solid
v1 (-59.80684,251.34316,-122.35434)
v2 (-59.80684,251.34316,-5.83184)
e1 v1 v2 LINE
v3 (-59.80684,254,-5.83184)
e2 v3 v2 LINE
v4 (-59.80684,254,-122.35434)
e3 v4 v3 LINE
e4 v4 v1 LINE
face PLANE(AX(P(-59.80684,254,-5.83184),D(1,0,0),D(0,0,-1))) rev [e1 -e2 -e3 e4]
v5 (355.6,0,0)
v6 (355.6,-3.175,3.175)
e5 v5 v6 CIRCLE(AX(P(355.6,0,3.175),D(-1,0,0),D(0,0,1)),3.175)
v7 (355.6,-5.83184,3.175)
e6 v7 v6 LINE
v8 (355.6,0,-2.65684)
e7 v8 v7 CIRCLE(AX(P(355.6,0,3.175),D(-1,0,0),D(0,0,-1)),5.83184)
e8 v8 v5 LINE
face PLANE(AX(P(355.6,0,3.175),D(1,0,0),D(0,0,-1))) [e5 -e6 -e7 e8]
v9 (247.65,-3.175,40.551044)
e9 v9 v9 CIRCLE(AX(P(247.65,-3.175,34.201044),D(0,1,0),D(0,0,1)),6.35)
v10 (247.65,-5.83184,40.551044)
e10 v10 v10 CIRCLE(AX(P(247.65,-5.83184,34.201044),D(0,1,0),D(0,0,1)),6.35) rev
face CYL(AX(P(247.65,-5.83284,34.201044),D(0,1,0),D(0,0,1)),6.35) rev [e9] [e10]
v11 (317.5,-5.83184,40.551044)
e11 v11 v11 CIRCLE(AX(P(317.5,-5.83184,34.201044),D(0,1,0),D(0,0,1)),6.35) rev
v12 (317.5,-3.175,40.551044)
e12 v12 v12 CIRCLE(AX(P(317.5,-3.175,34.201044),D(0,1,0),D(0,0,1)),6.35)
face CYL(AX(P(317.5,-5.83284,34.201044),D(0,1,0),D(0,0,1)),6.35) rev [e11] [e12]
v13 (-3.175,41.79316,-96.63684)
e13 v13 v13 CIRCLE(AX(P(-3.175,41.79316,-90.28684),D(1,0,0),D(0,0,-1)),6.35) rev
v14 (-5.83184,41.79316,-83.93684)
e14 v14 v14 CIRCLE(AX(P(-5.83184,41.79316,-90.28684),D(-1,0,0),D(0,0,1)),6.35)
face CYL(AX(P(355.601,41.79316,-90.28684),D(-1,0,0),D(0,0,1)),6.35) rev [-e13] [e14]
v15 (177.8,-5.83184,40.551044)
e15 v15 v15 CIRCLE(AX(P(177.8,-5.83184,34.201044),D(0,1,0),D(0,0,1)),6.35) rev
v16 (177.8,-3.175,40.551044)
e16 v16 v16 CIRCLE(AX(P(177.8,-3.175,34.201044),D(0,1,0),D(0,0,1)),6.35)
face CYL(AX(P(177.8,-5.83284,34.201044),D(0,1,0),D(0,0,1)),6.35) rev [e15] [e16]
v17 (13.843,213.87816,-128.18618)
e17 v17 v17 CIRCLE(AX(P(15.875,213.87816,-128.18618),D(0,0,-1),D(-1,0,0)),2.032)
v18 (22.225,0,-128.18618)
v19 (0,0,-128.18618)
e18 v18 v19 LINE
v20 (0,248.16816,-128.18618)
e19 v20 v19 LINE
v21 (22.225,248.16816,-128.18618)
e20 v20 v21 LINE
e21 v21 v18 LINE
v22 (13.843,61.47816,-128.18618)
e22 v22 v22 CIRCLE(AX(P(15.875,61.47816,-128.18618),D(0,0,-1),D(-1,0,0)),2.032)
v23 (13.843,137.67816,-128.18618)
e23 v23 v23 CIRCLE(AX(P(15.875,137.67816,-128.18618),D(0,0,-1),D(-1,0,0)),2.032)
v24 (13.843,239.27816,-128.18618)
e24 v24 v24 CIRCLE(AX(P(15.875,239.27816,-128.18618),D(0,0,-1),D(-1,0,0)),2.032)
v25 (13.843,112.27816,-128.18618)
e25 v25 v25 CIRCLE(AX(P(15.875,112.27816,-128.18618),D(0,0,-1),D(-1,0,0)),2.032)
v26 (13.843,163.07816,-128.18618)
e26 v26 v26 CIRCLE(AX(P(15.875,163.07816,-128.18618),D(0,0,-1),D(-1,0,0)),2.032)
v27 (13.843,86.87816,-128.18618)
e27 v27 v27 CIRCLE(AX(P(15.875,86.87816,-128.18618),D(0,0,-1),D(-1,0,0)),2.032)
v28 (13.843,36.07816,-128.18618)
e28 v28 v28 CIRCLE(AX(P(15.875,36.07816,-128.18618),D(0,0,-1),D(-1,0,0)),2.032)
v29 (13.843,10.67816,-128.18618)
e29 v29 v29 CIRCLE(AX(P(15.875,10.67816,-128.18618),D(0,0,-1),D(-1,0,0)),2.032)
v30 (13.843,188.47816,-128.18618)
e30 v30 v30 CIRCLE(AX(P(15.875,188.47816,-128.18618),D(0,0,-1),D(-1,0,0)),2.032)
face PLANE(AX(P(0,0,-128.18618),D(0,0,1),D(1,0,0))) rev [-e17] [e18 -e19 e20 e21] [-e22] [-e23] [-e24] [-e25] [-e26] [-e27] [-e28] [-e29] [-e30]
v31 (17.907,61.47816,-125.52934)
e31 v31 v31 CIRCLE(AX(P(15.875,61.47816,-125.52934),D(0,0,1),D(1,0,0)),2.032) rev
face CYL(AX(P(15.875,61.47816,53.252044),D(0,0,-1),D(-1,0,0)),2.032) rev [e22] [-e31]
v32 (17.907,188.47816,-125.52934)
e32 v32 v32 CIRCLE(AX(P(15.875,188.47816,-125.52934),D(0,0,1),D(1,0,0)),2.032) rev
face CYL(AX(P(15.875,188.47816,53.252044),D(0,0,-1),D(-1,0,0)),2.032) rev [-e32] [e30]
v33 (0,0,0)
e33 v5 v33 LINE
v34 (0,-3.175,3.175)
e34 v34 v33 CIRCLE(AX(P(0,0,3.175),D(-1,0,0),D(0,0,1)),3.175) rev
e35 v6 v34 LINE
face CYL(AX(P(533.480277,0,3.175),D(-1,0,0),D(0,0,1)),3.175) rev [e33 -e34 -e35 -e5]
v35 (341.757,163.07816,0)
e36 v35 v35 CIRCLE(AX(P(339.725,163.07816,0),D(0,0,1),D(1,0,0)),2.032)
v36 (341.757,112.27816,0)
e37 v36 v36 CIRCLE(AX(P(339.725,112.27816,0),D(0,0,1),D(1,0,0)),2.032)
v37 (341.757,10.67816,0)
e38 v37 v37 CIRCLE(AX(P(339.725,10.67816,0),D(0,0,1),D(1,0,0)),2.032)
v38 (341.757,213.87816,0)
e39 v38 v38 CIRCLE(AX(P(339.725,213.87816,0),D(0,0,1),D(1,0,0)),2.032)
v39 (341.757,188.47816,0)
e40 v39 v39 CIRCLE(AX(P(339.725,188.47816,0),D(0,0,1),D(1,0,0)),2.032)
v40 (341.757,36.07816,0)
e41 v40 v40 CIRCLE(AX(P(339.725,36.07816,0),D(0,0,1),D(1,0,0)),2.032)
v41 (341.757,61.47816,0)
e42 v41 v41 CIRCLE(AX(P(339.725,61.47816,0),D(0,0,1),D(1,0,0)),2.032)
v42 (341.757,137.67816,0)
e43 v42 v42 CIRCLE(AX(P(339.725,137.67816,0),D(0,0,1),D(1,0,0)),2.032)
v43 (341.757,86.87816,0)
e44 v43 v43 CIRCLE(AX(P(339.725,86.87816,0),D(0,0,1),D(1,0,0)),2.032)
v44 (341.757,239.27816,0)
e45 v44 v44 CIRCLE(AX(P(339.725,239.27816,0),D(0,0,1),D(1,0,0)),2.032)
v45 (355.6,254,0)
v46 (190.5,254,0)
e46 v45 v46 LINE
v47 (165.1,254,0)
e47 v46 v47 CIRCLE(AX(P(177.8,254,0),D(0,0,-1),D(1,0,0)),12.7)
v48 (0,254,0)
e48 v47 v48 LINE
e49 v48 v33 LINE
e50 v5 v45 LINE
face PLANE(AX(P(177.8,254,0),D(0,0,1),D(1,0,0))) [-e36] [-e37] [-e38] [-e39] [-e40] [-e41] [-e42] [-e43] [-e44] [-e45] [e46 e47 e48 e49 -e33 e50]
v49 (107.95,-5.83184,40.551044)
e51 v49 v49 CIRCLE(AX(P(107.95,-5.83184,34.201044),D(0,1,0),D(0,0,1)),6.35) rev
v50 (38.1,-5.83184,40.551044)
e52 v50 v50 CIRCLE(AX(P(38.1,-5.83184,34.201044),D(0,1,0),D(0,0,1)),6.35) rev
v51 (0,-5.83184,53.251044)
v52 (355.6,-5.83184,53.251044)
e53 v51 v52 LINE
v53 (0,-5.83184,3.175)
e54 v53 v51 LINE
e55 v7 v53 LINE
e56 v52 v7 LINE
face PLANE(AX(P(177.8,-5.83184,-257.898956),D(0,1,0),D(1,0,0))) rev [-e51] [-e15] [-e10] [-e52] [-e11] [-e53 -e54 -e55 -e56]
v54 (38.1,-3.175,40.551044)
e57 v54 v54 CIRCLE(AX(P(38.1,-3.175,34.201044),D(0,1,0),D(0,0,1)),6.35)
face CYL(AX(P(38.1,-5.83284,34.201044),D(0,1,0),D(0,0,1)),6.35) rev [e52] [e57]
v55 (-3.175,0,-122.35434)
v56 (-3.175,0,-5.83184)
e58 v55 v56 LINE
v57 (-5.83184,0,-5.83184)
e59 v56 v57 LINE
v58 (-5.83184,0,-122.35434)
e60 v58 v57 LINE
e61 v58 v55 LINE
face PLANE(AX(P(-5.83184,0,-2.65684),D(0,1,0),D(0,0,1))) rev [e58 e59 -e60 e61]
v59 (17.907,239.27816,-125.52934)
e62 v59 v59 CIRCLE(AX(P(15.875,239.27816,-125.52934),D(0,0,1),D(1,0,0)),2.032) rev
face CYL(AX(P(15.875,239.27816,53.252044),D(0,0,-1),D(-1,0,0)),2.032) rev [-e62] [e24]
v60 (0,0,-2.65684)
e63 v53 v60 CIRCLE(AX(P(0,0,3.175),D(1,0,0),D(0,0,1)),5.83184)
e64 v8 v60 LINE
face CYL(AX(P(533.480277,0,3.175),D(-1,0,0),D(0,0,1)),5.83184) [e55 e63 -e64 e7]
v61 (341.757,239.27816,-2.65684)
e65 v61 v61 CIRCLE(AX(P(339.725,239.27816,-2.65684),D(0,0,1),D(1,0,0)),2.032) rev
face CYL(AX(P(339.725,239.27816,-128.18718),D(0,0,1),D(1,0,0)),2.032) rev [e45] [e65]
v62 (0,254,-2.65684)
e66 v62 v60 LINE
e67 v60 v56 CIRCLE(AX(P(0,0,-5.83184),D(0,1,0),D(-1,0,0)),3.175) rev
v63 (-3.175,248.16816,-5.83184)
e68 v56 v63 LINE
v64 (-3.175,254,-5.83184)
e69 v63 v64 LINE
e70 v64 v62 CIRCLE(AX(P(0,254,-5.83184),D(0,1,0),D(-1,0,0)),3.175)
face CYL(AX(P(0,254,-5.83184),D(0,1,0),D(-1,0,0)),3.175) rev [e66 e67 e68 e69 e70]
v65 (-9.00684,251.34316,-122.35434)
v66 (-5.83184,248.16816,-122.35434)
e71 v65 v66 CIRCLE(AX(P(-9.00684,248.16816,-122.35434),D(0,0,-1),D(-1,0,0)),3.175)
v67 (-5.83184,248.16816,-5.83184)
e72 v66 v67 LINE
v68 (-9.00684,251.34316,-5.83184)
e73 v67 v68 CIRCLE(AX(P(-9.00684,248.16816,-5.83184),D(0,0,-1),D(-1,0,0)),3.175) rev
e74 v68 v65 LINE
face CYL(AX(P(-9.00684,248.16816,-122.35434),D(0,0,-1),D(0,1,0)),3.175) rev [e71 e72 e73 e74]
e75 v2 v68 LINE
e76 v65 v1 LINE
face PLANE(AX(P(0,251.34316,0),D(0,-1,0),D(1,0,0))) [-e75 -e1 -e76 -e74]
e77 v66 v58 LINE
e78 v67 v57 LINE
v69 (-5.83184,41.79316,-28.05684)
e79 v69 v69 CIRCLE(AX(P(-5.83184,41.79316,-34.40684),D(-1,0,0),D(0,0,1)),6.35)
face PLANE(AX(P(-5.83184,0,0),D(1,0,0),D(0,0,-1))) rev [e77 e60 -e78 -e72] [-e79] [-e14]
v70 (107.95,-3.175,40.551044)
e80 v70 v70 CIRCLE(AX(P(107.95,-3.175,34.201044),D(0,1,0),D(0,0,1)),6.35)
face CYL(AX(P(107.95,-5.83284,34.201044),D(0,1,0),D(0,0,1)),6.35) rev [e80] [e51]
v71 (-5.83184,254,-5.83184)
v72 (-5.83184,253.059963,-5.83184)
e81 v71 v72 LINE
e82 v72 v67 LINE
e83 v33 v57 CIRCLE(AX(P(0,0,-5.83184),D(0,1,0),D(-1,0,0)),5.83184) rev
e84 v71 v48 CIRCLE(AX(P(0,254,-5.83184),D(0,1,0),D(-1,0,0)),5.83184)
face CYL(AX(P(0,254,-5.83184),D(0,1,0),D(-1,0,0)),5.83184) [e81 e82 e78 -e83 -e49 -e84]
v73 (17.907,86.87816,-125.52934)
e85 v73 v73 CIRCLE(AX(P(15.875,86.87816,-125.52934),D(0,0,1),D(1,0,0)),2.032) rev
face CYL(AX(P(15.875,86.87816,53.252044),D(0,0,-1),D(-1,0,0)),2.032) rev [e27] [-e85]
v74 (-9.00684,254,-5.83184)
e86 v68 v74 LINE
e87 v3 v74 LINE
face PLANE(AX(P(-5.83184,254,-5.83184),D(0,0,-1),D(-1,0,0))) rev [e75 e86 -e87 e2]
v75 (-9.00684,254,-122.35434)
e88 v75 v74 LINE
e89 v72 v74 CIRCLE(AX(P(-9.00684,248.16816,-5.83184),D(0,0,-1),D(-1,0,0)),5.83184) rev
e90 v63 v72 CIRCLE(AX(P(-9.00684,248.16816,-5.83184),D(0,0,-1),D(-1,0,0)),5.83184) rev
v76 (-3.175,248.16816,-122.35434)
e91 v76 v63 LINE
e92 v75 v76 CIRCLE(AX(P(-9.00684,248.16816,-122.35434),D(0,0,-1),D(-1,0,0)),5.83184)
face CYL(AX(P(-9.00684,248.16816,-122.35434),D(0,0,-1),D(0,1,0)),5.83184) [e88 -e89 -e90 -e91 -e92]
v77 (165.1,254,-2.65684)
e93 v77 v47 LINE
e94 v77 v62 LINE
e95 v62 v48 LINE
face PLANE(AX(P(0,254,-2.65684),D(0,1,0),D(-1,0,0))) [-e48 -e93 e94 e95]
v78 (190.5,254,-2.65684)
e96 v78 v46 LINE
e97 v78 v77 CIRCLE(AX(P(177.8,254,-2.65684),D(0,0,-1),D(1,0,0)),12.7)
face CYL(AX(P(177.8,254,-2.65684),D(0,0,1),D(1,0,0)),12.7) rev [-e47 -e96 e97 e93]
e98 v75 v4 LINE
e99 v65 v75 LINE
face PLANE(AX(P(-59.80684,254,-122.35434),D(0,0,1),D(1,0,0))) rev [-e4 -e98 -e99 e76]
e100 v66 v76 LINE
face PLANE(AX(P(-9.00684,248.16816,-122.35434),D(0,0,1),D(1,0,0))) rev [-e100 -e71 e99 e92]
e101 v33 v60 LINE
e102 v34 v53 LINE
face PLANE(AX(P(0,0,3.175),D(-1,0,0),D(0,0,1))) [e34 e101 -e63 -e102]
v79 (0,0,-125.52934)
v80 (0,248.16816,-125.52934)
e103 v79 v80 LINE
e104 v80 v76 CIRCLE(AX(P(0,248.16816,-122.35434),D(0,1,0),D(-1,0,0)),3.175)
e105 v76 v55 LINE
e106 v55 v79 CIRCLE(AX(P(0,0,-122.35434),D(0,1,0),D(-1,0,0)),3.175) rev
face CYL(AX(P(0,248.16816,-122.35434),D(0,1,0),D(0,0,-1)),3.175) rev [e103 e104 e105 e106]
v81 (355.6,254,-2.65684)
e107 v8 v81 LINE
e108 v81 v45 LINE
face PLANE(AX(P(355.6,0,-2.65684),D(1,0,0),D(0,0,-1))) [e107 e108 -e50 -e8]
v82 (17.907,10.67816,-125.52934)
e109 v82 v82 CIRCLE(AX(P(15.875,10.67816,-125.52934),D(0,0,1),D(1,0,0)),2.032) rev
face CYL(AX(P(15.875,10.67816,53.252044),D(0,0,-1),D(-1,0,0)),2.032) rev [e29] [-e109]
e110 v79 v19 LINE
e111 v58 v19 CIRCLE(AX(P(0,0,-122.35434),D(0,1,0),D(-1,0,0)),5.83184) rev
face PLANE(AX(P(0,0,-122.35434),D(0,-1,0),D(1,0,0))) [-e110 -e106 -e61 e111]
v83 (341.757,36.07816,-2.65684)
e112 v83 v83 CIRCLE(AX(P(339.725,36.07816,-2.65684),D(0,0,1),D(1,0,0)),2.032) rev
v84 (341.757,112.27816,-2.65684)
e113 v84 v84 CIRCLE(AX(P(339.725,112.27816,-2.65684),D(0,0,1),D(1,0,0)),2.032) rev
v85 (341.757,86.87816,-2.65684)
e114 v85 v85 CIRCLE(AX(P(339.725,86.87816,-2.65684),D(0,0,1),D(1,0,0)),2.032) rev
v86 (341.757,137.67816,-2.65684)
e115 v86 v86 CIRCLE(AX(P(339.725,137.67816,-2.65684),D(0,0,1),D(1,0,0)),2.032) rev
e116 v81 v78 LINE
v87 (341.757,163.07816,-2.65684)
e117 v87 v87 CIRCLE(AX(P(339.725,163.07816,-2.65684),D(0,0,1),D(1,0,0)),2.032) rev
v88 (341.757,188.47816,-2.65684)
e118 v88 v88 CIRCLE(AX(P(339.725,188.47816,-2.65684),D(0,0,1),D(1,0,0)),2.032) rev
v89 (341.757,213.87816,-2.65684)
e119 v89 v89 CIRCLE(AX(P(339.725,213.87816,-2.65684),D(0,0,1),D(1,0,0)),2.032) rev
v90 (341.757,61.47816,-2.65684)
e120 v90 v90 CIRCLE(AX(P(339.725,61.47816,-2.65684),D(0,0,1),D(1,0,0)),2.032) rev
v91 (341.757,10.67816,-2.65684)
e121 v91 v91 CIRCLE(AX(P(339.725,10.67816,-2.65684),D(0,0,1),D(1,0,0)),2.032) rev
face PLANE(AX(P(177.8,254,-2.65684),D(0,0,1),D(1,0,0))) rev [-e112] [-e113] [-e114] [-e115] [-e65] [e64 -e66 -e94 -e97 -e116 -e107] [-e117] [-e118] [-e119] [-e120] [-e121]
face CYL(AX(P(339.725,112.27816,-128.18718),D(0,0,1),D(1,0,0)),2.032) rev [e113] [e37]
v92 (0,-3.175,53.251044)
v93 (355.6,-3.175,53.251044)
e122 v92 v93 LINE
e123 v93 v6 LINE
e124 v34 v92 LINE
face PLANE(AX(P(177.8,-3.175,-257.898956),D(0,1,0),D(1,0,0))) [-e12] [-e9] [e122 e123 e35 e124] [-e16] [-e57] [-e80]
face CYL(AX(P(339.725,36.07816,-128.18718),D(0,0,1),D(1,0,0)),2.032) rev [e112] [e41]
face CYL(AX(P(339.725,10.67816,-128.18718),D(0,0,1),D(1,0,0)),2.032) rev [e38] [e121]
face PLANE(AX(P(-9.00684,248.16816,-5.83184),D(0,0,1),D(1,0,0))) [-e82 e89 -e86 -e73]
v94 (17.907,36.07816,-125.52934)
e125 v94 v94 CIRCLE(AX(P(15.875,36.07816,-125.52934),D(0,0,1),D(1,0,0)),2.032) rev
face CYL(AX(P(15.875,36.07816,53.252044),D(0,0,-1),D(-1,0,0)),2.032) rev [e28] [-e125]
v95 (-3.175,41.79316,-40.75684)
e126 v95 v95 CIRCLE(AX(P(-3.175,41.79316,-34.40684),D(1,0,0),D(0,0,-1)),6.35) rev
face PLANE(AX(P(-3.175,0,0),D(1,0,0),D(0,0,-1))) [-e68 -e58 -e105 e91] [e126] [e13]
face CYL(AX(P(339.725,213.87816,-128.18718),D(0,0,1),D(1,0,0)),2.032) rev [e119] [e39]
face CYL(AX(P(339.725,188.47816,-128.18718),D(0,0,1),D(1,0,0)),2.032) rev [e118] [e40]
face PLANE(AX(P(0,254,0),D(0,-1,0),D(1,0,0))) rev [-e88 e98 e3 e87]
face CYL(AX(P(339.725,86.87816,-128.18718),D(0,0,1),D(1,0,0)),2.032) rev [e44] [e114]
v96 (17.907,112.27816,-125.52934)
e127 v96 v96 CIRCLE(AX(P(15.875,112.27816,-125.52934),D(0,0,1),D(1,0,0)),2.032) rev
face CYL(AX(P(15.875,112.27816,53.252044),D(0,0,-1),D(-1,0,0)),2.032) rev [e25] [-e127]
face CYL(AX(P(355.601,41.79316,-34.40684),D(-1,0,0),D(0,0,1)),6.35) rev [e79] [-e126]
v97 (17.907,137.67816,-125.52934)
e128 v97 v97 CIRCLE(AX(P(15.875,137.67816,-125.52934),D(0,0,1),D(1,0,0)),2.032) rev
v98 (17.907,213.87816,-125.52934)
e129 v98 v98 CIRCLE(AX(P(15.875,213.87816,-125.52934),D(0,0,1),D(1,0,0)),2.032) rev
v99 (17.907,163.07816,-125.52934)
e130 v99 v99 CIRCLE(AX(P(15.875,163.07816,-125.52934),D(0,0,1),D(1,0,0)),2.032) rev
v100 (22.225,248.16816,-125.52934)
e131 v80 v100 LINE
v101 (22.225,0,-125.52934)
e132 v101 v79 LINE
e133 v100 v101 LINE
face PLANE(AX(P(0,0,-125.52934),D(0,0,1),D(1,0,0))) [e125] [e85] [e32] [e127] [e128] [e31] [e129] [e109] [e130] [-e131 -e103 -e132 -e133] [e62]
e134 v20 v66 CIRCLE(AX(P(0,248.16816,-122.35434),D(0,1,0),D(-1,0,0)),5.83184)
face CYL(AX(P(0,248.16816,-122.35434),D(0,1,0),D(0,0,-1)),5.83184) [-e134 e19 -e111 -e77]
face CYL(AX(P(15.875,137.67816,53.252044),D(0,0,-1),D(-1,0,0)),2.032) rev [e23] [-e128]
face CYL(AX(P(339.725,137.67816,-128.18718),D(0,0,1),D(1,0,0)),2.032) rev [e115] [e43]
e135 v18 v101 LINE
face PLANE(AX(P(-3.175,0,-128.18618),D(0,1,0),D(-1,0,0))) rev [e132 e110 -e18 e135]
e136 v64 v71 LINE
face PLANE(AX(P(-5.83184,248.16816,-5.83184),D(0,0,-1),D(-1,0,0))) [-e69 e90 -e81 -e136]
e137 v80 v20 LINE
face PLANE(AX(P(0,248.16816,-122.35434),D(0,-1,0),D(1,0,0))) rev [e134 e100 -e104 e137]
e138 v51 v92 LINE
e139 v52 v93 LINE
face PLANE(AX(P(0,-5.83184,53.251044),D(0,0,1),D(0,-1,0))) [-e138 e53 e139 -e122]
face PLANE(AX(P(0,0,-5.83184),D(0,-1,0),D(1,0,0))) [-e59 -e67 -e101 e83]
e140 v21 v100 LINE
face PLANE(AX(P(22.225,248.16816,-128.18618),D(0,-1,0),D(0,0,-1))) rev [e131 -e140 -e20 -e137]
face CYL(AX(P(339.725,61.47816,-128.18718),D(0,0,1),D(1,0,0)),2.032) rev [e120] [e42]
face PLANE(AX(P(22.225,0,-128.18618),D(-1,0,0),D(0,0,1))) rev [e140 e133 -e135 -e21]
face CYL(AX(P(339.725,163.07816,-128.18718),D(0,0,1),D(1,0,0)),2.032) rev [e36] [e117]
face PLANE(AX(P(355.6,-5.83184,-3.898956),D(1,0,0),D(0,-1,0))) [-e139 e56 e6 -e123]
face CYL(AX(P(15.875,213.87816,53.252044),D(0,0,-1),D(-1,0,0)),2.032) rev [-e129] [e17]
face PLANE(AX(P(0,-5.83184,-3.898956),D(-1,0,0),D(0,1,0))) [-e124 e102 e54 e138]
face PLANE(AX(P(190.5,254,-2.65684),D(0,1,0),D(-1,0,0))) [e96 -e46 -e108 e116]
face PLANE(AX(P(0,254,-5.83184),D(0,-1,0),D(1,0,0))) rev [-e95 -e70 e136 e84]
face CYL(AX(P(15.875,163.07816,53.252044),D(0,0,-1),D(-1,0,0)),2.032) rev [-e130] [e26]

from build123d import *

# Parameters (mm, degrees)
BASE_FLANGE1_DEPTH           = 2.65684
SKETCHED_BEND3_DEPTH         = 355.6
SKETCHED_BEND3_2_DEPTH       = 355.6
SKETCH10_R                   = 6.35
CUT_EXTRUDE2_DEPTH           = 2.65684
EDGE_FLANGE5_DEPTH           = 254
EDGE_FLANGE6_STRIP_W         = 16.97736
EDGE_FLANGE6_STRIP_H         = 2.65684
EDGE_FLANGE6_STRIP_CUT_DEPTH = 116.5225
EDGE_FLANGE6_DEPTH           = 116.5225
EDGE_FLANGE7_DEPTH           = 248.16816
SKETCH38_R                   = 2.032
CUT_EXTRUDE4_DEPTH           = 2.65684
SKETCH39_R                   = 2.032
CUT_EXTRUDE5_DEPTH           = 2.65684
SKETCH40_R                   = 6.35
CUT_EXTRUDE6_DEPTH           = 2.65684


# Read off the part's stored shape, not the designer's step: Sketched Bend3
# Sheet-metal steps are written as plain solids
with BuildPart() as part:
    # Sketch1 → Base-Flange1 (new body)
    with BuildSketch(Plane.XY):
        with BuildLine():
            Line((0, 0), (0, 254))
            Line((0, 254), (165.1, 254))
            ThreePointArc((165.1, 254), (177.8, 241.3), (190.5, 254))
            Line((190.5, 254), (355.6, 254))
            Line((355.6, 254), (355.6, 0))
            Line((355.6, 0), (355.6, -57.15))
            Line((355.6, -57.15), (0, -57.15))
            Line((0, -57.15), (0, 0))
        make_face()
    extrude(amount=-BASE_FLANGE1_DEPTH)

    # Sketched Bend3 outline → Sketched Bend3 (cut)
    with BuildSketch(Plane.YZ):
        with BuildLine():
            ThreePointArc((0, -2.65684), (-2.783367186, -1.949765838), (-4.891802611, 0))
            Line((-4.891802611, 0), (-57.15, 0))
            Line((-57.15, 0), (-57.15, -2.65684))
            Line((-57.15, -2.65684), (0, -2.65684))
        make_face()
    extrude(amount=SKETCHED_BEND3_DEPTH, mode=Mode.SUBTRACT)

    # Sketched Bend3 2 outline → Sketched Bend3 2 (add)
    with BuildSketch(Plane.YZ):
        with BuildLine():
            ThreePointArc((0, 0), (-2.24506403, 0.92993597), (-3.175, 3.175))
            Line((-3.175, 3.175), (-3.175, 53.251044406))
            Line((-3.175, 53.251044406), (-5.83184, 53.251044406))
            Line((-5.83184, 53.251044406), (-5.83184, 3.175))
            ThreePointArc((-5.83184, 3.175), (-5.591894488, 1.519381136), (-4.891802611, 0))
            Line((-4.891802611, 0), (0, 0))
        make_face()
    extrude(amount=SKETCHED_BEND3_2_DEPTH)

    # Sketch10 → Cut-Extrude2 (cut)
    with BuildSketch(Plane(origin=(0, -3.175, 0), x_dir=(1, 0, 0), z_dir=(0, 1, 0))):
        with Locations(Location((317.5, -34.201044406, 0), (0, 0, 270))):
            Circle(SKETCH10_R)
        with Locations(Location((247.65, -34.201044406, 0), (0, 0, 270))):
            Circle(SKETCH10_R)
        with Locations(Location((38.1, -34.201044406, 0), (0, 0, 270))):
            Circle(SKETCH10_R)
        with Locations(Location((107.95, -34.201044406, 0), (0, 0, 270))):
            Circle(SKETCH10_R)
        with Locations(Location((177.8, -34.201044406, 0), (0, 0, 270))):
            Circle(SKETCH10_R)
    extrude(amount=-CUT_EXTRUDE2_DEPTH, mode=Mode.SUBTRACT)

    # Edge-Flange5 section (across the edge) → Edge-Flange5 (add)
    with BuildSketch(Plane(origin=(-3.175, 0, -2.65684), x_dir=(1, 0, 0), z_dir=(0, 1, 0))):
        with BuildLine():
            Line((-2.65684, 3.175), (-2.65684, 119.6975))
            Line((-2.65684, 119.6975), (0, 119.6975))
            Line((0, 119.6975), (0, 3.175))
            ThreePointArc((0, 3.175), (0.92993597, 0.92993597), (3.175, 0))
            Line((3.175, 0), (3.175, -2.65684))
            ThreePointArc((3.175, -2.65684), (-0.948733611, -0.948733611), (-2.65684, 3.175))
        make_face()
    extrude(amount=EDGE_FLANGE5_DEPTH)

    # Edge-Flange6 strip (across the edge) → Edge-Flange6 strip cut (cut)
    with BuildSketch(Plane(origin=(-5.83184, 254, -5.83184), x_dir=(0, -1, 0), z_dir=(0, 0, -1))):
        with Locations((-2.65684, -1.32842)):
            Rectangle(EDGE_FLANGE6_STRIP_W, EDGE_FLANGE6_STRIP_H)
    extrude(amount=EDGE_FLANGE6_STRIP_CUT_DEPTH, mode=Mode.SUBTRACT)

    # Edge-Flange6 section (across the edge) → Edge-Flange6 (add)
    with BuildSketch(Plane(origin=(-5.83184, 254, -5.83184), x_dir=(0, -1, 0), z_dir=(0, 0, -1))):
        with BuildLine():
            Line((0, 3.175), (0, 53.975))
            Line((0, 53.975), (2.65684, 53.975))
            Line((2.65684, 53.975), (2.65684, 3.175))
            ThreePointArc((2.65684, 3.175), (3.58677597, 0.92993597), (5.83184, 0))
            Line((5.83184, 0), (5.83184, -2.65684))
            ThreePointArc((5.83184, -2.65684), (1.708106389, -0.948733611), (0, 3.175))
        make_face()
    extrude(amount=EDGE_FLANGE6_DEPTH)

    # Edge-Flange7 section (across the edge) → Edge-Flange7 (add)
    with BuildSketch(Plane(origin=(-3.175, 0, -125.52934), x_dir=(0, 0, 1), z_dir=(0, 1, 0))):
        with BuildLine():
            Line((-2.65684, 3.175), (-2.65684, 25.4))
            Line((-2.65684, 25.4), (0, 25.4))
            Line((0, 25.4), (0, 3.175))
            ThreePointArc((0, 3.175), (0.92993597, 0.92993597), (3.175, 0))
            Line((3.175, 0), (3.175, -2.65684))
            ThreePointArc((3.175, -2.65684), (-0.948733611, -0.948733611), (-2.65684, 3.175))
        make_face()
    extrude(amount=EDGE_FLANGE7_DEPTH)

    # Sketch38 → Cut-Extrude4 (cut)
    with BuildSketch(Plane(origin=(0, 0, -128.18618), x_dir=(-1, 0, 0), z_dir=(0, 0, -1))):
        with Locations((-15.875, 239.27816)):
            Circle(SKETCH38_R)
        with Locations((-15.875, 213.87816)):
            Circle(SKETCH38_R)
        with Locations((-15.875, 188.47816)):
            Circle(SKETCH38_R)
        with Locations((-15.875, 163.07816)):
            Circle(SKETCH38_R)
        with Locations((-15.875, 137.67816)):
            Circle(SKETCH38_R)
        with Locations((-15.875, 112.27816)):
            Circle(SKETCH38_R)
        with Locations((-15.875, 86.87816)):
            Circle(SKETCH38_R)
        with Locations((-15.875, 61.47816)):
            Circle(SKETCH38_R)
        with Locations((-15.875, 36.07816)):
            Circle(SKETCH38_R)
        with Locations((-15.875, 10.67816)):
            Circle(SKETCH38_R)
    extrude(amount=-CUT_EXTRUDE4_DEPTH, mode=Mode.SUBTRACT)

    # Sketch39 → Cut-Extrude5 (cut)
    with BuildSketch(Plane.XY):
        with Locations((339.725, 10.67816)):
            Circle(SKETCH39_R)
        with Locations((339.725, 36.07816)):
            Circle(SKETCH39_R)
        with Locations((339.725, 61.47816)):
            Circle(SKETCH39_R)
        with Locations((339.725, 86.87816)):
            Circle(SKETCH39_R)
        with Locations((339.725, 112.27816)):
            Circle(SKETCH39_R)
        with Locations((339.725, 137.67816)):
            Circle(SKETCH39_R)
        with Locations((339.725, 163.07816)):
            Circle(SKETCH39_R)
        with Locations((339.725, 188.47816)):
            Circle(SKETCH39_R)
        with Locations((339.725, 213.87816)):
            Circle(SKETCH39_R)
        with Locations((339.725, 239.27816)):
            Circle(SKETCH39_R)
    extrude(amount=-CUT_EXTRUDE5_DEPTH, mode=Mode.SUBTRACT)

    # Sketch40 → Cut-Extrude6 (cut)
    with BuildSketch(Plane.ZY.offset(5.83184)):
        with Locations((-34.40684, 41.79316)):
            Circle(SKETCH40_R)
        with Locations((-90.28684, 41.79316)):
            Circle(SKETCH40_R)
    extrude(amount=-CUT_EXTRUDE6_DEPTH, mode=Mode.SUBTRACT)


solid = part.part
